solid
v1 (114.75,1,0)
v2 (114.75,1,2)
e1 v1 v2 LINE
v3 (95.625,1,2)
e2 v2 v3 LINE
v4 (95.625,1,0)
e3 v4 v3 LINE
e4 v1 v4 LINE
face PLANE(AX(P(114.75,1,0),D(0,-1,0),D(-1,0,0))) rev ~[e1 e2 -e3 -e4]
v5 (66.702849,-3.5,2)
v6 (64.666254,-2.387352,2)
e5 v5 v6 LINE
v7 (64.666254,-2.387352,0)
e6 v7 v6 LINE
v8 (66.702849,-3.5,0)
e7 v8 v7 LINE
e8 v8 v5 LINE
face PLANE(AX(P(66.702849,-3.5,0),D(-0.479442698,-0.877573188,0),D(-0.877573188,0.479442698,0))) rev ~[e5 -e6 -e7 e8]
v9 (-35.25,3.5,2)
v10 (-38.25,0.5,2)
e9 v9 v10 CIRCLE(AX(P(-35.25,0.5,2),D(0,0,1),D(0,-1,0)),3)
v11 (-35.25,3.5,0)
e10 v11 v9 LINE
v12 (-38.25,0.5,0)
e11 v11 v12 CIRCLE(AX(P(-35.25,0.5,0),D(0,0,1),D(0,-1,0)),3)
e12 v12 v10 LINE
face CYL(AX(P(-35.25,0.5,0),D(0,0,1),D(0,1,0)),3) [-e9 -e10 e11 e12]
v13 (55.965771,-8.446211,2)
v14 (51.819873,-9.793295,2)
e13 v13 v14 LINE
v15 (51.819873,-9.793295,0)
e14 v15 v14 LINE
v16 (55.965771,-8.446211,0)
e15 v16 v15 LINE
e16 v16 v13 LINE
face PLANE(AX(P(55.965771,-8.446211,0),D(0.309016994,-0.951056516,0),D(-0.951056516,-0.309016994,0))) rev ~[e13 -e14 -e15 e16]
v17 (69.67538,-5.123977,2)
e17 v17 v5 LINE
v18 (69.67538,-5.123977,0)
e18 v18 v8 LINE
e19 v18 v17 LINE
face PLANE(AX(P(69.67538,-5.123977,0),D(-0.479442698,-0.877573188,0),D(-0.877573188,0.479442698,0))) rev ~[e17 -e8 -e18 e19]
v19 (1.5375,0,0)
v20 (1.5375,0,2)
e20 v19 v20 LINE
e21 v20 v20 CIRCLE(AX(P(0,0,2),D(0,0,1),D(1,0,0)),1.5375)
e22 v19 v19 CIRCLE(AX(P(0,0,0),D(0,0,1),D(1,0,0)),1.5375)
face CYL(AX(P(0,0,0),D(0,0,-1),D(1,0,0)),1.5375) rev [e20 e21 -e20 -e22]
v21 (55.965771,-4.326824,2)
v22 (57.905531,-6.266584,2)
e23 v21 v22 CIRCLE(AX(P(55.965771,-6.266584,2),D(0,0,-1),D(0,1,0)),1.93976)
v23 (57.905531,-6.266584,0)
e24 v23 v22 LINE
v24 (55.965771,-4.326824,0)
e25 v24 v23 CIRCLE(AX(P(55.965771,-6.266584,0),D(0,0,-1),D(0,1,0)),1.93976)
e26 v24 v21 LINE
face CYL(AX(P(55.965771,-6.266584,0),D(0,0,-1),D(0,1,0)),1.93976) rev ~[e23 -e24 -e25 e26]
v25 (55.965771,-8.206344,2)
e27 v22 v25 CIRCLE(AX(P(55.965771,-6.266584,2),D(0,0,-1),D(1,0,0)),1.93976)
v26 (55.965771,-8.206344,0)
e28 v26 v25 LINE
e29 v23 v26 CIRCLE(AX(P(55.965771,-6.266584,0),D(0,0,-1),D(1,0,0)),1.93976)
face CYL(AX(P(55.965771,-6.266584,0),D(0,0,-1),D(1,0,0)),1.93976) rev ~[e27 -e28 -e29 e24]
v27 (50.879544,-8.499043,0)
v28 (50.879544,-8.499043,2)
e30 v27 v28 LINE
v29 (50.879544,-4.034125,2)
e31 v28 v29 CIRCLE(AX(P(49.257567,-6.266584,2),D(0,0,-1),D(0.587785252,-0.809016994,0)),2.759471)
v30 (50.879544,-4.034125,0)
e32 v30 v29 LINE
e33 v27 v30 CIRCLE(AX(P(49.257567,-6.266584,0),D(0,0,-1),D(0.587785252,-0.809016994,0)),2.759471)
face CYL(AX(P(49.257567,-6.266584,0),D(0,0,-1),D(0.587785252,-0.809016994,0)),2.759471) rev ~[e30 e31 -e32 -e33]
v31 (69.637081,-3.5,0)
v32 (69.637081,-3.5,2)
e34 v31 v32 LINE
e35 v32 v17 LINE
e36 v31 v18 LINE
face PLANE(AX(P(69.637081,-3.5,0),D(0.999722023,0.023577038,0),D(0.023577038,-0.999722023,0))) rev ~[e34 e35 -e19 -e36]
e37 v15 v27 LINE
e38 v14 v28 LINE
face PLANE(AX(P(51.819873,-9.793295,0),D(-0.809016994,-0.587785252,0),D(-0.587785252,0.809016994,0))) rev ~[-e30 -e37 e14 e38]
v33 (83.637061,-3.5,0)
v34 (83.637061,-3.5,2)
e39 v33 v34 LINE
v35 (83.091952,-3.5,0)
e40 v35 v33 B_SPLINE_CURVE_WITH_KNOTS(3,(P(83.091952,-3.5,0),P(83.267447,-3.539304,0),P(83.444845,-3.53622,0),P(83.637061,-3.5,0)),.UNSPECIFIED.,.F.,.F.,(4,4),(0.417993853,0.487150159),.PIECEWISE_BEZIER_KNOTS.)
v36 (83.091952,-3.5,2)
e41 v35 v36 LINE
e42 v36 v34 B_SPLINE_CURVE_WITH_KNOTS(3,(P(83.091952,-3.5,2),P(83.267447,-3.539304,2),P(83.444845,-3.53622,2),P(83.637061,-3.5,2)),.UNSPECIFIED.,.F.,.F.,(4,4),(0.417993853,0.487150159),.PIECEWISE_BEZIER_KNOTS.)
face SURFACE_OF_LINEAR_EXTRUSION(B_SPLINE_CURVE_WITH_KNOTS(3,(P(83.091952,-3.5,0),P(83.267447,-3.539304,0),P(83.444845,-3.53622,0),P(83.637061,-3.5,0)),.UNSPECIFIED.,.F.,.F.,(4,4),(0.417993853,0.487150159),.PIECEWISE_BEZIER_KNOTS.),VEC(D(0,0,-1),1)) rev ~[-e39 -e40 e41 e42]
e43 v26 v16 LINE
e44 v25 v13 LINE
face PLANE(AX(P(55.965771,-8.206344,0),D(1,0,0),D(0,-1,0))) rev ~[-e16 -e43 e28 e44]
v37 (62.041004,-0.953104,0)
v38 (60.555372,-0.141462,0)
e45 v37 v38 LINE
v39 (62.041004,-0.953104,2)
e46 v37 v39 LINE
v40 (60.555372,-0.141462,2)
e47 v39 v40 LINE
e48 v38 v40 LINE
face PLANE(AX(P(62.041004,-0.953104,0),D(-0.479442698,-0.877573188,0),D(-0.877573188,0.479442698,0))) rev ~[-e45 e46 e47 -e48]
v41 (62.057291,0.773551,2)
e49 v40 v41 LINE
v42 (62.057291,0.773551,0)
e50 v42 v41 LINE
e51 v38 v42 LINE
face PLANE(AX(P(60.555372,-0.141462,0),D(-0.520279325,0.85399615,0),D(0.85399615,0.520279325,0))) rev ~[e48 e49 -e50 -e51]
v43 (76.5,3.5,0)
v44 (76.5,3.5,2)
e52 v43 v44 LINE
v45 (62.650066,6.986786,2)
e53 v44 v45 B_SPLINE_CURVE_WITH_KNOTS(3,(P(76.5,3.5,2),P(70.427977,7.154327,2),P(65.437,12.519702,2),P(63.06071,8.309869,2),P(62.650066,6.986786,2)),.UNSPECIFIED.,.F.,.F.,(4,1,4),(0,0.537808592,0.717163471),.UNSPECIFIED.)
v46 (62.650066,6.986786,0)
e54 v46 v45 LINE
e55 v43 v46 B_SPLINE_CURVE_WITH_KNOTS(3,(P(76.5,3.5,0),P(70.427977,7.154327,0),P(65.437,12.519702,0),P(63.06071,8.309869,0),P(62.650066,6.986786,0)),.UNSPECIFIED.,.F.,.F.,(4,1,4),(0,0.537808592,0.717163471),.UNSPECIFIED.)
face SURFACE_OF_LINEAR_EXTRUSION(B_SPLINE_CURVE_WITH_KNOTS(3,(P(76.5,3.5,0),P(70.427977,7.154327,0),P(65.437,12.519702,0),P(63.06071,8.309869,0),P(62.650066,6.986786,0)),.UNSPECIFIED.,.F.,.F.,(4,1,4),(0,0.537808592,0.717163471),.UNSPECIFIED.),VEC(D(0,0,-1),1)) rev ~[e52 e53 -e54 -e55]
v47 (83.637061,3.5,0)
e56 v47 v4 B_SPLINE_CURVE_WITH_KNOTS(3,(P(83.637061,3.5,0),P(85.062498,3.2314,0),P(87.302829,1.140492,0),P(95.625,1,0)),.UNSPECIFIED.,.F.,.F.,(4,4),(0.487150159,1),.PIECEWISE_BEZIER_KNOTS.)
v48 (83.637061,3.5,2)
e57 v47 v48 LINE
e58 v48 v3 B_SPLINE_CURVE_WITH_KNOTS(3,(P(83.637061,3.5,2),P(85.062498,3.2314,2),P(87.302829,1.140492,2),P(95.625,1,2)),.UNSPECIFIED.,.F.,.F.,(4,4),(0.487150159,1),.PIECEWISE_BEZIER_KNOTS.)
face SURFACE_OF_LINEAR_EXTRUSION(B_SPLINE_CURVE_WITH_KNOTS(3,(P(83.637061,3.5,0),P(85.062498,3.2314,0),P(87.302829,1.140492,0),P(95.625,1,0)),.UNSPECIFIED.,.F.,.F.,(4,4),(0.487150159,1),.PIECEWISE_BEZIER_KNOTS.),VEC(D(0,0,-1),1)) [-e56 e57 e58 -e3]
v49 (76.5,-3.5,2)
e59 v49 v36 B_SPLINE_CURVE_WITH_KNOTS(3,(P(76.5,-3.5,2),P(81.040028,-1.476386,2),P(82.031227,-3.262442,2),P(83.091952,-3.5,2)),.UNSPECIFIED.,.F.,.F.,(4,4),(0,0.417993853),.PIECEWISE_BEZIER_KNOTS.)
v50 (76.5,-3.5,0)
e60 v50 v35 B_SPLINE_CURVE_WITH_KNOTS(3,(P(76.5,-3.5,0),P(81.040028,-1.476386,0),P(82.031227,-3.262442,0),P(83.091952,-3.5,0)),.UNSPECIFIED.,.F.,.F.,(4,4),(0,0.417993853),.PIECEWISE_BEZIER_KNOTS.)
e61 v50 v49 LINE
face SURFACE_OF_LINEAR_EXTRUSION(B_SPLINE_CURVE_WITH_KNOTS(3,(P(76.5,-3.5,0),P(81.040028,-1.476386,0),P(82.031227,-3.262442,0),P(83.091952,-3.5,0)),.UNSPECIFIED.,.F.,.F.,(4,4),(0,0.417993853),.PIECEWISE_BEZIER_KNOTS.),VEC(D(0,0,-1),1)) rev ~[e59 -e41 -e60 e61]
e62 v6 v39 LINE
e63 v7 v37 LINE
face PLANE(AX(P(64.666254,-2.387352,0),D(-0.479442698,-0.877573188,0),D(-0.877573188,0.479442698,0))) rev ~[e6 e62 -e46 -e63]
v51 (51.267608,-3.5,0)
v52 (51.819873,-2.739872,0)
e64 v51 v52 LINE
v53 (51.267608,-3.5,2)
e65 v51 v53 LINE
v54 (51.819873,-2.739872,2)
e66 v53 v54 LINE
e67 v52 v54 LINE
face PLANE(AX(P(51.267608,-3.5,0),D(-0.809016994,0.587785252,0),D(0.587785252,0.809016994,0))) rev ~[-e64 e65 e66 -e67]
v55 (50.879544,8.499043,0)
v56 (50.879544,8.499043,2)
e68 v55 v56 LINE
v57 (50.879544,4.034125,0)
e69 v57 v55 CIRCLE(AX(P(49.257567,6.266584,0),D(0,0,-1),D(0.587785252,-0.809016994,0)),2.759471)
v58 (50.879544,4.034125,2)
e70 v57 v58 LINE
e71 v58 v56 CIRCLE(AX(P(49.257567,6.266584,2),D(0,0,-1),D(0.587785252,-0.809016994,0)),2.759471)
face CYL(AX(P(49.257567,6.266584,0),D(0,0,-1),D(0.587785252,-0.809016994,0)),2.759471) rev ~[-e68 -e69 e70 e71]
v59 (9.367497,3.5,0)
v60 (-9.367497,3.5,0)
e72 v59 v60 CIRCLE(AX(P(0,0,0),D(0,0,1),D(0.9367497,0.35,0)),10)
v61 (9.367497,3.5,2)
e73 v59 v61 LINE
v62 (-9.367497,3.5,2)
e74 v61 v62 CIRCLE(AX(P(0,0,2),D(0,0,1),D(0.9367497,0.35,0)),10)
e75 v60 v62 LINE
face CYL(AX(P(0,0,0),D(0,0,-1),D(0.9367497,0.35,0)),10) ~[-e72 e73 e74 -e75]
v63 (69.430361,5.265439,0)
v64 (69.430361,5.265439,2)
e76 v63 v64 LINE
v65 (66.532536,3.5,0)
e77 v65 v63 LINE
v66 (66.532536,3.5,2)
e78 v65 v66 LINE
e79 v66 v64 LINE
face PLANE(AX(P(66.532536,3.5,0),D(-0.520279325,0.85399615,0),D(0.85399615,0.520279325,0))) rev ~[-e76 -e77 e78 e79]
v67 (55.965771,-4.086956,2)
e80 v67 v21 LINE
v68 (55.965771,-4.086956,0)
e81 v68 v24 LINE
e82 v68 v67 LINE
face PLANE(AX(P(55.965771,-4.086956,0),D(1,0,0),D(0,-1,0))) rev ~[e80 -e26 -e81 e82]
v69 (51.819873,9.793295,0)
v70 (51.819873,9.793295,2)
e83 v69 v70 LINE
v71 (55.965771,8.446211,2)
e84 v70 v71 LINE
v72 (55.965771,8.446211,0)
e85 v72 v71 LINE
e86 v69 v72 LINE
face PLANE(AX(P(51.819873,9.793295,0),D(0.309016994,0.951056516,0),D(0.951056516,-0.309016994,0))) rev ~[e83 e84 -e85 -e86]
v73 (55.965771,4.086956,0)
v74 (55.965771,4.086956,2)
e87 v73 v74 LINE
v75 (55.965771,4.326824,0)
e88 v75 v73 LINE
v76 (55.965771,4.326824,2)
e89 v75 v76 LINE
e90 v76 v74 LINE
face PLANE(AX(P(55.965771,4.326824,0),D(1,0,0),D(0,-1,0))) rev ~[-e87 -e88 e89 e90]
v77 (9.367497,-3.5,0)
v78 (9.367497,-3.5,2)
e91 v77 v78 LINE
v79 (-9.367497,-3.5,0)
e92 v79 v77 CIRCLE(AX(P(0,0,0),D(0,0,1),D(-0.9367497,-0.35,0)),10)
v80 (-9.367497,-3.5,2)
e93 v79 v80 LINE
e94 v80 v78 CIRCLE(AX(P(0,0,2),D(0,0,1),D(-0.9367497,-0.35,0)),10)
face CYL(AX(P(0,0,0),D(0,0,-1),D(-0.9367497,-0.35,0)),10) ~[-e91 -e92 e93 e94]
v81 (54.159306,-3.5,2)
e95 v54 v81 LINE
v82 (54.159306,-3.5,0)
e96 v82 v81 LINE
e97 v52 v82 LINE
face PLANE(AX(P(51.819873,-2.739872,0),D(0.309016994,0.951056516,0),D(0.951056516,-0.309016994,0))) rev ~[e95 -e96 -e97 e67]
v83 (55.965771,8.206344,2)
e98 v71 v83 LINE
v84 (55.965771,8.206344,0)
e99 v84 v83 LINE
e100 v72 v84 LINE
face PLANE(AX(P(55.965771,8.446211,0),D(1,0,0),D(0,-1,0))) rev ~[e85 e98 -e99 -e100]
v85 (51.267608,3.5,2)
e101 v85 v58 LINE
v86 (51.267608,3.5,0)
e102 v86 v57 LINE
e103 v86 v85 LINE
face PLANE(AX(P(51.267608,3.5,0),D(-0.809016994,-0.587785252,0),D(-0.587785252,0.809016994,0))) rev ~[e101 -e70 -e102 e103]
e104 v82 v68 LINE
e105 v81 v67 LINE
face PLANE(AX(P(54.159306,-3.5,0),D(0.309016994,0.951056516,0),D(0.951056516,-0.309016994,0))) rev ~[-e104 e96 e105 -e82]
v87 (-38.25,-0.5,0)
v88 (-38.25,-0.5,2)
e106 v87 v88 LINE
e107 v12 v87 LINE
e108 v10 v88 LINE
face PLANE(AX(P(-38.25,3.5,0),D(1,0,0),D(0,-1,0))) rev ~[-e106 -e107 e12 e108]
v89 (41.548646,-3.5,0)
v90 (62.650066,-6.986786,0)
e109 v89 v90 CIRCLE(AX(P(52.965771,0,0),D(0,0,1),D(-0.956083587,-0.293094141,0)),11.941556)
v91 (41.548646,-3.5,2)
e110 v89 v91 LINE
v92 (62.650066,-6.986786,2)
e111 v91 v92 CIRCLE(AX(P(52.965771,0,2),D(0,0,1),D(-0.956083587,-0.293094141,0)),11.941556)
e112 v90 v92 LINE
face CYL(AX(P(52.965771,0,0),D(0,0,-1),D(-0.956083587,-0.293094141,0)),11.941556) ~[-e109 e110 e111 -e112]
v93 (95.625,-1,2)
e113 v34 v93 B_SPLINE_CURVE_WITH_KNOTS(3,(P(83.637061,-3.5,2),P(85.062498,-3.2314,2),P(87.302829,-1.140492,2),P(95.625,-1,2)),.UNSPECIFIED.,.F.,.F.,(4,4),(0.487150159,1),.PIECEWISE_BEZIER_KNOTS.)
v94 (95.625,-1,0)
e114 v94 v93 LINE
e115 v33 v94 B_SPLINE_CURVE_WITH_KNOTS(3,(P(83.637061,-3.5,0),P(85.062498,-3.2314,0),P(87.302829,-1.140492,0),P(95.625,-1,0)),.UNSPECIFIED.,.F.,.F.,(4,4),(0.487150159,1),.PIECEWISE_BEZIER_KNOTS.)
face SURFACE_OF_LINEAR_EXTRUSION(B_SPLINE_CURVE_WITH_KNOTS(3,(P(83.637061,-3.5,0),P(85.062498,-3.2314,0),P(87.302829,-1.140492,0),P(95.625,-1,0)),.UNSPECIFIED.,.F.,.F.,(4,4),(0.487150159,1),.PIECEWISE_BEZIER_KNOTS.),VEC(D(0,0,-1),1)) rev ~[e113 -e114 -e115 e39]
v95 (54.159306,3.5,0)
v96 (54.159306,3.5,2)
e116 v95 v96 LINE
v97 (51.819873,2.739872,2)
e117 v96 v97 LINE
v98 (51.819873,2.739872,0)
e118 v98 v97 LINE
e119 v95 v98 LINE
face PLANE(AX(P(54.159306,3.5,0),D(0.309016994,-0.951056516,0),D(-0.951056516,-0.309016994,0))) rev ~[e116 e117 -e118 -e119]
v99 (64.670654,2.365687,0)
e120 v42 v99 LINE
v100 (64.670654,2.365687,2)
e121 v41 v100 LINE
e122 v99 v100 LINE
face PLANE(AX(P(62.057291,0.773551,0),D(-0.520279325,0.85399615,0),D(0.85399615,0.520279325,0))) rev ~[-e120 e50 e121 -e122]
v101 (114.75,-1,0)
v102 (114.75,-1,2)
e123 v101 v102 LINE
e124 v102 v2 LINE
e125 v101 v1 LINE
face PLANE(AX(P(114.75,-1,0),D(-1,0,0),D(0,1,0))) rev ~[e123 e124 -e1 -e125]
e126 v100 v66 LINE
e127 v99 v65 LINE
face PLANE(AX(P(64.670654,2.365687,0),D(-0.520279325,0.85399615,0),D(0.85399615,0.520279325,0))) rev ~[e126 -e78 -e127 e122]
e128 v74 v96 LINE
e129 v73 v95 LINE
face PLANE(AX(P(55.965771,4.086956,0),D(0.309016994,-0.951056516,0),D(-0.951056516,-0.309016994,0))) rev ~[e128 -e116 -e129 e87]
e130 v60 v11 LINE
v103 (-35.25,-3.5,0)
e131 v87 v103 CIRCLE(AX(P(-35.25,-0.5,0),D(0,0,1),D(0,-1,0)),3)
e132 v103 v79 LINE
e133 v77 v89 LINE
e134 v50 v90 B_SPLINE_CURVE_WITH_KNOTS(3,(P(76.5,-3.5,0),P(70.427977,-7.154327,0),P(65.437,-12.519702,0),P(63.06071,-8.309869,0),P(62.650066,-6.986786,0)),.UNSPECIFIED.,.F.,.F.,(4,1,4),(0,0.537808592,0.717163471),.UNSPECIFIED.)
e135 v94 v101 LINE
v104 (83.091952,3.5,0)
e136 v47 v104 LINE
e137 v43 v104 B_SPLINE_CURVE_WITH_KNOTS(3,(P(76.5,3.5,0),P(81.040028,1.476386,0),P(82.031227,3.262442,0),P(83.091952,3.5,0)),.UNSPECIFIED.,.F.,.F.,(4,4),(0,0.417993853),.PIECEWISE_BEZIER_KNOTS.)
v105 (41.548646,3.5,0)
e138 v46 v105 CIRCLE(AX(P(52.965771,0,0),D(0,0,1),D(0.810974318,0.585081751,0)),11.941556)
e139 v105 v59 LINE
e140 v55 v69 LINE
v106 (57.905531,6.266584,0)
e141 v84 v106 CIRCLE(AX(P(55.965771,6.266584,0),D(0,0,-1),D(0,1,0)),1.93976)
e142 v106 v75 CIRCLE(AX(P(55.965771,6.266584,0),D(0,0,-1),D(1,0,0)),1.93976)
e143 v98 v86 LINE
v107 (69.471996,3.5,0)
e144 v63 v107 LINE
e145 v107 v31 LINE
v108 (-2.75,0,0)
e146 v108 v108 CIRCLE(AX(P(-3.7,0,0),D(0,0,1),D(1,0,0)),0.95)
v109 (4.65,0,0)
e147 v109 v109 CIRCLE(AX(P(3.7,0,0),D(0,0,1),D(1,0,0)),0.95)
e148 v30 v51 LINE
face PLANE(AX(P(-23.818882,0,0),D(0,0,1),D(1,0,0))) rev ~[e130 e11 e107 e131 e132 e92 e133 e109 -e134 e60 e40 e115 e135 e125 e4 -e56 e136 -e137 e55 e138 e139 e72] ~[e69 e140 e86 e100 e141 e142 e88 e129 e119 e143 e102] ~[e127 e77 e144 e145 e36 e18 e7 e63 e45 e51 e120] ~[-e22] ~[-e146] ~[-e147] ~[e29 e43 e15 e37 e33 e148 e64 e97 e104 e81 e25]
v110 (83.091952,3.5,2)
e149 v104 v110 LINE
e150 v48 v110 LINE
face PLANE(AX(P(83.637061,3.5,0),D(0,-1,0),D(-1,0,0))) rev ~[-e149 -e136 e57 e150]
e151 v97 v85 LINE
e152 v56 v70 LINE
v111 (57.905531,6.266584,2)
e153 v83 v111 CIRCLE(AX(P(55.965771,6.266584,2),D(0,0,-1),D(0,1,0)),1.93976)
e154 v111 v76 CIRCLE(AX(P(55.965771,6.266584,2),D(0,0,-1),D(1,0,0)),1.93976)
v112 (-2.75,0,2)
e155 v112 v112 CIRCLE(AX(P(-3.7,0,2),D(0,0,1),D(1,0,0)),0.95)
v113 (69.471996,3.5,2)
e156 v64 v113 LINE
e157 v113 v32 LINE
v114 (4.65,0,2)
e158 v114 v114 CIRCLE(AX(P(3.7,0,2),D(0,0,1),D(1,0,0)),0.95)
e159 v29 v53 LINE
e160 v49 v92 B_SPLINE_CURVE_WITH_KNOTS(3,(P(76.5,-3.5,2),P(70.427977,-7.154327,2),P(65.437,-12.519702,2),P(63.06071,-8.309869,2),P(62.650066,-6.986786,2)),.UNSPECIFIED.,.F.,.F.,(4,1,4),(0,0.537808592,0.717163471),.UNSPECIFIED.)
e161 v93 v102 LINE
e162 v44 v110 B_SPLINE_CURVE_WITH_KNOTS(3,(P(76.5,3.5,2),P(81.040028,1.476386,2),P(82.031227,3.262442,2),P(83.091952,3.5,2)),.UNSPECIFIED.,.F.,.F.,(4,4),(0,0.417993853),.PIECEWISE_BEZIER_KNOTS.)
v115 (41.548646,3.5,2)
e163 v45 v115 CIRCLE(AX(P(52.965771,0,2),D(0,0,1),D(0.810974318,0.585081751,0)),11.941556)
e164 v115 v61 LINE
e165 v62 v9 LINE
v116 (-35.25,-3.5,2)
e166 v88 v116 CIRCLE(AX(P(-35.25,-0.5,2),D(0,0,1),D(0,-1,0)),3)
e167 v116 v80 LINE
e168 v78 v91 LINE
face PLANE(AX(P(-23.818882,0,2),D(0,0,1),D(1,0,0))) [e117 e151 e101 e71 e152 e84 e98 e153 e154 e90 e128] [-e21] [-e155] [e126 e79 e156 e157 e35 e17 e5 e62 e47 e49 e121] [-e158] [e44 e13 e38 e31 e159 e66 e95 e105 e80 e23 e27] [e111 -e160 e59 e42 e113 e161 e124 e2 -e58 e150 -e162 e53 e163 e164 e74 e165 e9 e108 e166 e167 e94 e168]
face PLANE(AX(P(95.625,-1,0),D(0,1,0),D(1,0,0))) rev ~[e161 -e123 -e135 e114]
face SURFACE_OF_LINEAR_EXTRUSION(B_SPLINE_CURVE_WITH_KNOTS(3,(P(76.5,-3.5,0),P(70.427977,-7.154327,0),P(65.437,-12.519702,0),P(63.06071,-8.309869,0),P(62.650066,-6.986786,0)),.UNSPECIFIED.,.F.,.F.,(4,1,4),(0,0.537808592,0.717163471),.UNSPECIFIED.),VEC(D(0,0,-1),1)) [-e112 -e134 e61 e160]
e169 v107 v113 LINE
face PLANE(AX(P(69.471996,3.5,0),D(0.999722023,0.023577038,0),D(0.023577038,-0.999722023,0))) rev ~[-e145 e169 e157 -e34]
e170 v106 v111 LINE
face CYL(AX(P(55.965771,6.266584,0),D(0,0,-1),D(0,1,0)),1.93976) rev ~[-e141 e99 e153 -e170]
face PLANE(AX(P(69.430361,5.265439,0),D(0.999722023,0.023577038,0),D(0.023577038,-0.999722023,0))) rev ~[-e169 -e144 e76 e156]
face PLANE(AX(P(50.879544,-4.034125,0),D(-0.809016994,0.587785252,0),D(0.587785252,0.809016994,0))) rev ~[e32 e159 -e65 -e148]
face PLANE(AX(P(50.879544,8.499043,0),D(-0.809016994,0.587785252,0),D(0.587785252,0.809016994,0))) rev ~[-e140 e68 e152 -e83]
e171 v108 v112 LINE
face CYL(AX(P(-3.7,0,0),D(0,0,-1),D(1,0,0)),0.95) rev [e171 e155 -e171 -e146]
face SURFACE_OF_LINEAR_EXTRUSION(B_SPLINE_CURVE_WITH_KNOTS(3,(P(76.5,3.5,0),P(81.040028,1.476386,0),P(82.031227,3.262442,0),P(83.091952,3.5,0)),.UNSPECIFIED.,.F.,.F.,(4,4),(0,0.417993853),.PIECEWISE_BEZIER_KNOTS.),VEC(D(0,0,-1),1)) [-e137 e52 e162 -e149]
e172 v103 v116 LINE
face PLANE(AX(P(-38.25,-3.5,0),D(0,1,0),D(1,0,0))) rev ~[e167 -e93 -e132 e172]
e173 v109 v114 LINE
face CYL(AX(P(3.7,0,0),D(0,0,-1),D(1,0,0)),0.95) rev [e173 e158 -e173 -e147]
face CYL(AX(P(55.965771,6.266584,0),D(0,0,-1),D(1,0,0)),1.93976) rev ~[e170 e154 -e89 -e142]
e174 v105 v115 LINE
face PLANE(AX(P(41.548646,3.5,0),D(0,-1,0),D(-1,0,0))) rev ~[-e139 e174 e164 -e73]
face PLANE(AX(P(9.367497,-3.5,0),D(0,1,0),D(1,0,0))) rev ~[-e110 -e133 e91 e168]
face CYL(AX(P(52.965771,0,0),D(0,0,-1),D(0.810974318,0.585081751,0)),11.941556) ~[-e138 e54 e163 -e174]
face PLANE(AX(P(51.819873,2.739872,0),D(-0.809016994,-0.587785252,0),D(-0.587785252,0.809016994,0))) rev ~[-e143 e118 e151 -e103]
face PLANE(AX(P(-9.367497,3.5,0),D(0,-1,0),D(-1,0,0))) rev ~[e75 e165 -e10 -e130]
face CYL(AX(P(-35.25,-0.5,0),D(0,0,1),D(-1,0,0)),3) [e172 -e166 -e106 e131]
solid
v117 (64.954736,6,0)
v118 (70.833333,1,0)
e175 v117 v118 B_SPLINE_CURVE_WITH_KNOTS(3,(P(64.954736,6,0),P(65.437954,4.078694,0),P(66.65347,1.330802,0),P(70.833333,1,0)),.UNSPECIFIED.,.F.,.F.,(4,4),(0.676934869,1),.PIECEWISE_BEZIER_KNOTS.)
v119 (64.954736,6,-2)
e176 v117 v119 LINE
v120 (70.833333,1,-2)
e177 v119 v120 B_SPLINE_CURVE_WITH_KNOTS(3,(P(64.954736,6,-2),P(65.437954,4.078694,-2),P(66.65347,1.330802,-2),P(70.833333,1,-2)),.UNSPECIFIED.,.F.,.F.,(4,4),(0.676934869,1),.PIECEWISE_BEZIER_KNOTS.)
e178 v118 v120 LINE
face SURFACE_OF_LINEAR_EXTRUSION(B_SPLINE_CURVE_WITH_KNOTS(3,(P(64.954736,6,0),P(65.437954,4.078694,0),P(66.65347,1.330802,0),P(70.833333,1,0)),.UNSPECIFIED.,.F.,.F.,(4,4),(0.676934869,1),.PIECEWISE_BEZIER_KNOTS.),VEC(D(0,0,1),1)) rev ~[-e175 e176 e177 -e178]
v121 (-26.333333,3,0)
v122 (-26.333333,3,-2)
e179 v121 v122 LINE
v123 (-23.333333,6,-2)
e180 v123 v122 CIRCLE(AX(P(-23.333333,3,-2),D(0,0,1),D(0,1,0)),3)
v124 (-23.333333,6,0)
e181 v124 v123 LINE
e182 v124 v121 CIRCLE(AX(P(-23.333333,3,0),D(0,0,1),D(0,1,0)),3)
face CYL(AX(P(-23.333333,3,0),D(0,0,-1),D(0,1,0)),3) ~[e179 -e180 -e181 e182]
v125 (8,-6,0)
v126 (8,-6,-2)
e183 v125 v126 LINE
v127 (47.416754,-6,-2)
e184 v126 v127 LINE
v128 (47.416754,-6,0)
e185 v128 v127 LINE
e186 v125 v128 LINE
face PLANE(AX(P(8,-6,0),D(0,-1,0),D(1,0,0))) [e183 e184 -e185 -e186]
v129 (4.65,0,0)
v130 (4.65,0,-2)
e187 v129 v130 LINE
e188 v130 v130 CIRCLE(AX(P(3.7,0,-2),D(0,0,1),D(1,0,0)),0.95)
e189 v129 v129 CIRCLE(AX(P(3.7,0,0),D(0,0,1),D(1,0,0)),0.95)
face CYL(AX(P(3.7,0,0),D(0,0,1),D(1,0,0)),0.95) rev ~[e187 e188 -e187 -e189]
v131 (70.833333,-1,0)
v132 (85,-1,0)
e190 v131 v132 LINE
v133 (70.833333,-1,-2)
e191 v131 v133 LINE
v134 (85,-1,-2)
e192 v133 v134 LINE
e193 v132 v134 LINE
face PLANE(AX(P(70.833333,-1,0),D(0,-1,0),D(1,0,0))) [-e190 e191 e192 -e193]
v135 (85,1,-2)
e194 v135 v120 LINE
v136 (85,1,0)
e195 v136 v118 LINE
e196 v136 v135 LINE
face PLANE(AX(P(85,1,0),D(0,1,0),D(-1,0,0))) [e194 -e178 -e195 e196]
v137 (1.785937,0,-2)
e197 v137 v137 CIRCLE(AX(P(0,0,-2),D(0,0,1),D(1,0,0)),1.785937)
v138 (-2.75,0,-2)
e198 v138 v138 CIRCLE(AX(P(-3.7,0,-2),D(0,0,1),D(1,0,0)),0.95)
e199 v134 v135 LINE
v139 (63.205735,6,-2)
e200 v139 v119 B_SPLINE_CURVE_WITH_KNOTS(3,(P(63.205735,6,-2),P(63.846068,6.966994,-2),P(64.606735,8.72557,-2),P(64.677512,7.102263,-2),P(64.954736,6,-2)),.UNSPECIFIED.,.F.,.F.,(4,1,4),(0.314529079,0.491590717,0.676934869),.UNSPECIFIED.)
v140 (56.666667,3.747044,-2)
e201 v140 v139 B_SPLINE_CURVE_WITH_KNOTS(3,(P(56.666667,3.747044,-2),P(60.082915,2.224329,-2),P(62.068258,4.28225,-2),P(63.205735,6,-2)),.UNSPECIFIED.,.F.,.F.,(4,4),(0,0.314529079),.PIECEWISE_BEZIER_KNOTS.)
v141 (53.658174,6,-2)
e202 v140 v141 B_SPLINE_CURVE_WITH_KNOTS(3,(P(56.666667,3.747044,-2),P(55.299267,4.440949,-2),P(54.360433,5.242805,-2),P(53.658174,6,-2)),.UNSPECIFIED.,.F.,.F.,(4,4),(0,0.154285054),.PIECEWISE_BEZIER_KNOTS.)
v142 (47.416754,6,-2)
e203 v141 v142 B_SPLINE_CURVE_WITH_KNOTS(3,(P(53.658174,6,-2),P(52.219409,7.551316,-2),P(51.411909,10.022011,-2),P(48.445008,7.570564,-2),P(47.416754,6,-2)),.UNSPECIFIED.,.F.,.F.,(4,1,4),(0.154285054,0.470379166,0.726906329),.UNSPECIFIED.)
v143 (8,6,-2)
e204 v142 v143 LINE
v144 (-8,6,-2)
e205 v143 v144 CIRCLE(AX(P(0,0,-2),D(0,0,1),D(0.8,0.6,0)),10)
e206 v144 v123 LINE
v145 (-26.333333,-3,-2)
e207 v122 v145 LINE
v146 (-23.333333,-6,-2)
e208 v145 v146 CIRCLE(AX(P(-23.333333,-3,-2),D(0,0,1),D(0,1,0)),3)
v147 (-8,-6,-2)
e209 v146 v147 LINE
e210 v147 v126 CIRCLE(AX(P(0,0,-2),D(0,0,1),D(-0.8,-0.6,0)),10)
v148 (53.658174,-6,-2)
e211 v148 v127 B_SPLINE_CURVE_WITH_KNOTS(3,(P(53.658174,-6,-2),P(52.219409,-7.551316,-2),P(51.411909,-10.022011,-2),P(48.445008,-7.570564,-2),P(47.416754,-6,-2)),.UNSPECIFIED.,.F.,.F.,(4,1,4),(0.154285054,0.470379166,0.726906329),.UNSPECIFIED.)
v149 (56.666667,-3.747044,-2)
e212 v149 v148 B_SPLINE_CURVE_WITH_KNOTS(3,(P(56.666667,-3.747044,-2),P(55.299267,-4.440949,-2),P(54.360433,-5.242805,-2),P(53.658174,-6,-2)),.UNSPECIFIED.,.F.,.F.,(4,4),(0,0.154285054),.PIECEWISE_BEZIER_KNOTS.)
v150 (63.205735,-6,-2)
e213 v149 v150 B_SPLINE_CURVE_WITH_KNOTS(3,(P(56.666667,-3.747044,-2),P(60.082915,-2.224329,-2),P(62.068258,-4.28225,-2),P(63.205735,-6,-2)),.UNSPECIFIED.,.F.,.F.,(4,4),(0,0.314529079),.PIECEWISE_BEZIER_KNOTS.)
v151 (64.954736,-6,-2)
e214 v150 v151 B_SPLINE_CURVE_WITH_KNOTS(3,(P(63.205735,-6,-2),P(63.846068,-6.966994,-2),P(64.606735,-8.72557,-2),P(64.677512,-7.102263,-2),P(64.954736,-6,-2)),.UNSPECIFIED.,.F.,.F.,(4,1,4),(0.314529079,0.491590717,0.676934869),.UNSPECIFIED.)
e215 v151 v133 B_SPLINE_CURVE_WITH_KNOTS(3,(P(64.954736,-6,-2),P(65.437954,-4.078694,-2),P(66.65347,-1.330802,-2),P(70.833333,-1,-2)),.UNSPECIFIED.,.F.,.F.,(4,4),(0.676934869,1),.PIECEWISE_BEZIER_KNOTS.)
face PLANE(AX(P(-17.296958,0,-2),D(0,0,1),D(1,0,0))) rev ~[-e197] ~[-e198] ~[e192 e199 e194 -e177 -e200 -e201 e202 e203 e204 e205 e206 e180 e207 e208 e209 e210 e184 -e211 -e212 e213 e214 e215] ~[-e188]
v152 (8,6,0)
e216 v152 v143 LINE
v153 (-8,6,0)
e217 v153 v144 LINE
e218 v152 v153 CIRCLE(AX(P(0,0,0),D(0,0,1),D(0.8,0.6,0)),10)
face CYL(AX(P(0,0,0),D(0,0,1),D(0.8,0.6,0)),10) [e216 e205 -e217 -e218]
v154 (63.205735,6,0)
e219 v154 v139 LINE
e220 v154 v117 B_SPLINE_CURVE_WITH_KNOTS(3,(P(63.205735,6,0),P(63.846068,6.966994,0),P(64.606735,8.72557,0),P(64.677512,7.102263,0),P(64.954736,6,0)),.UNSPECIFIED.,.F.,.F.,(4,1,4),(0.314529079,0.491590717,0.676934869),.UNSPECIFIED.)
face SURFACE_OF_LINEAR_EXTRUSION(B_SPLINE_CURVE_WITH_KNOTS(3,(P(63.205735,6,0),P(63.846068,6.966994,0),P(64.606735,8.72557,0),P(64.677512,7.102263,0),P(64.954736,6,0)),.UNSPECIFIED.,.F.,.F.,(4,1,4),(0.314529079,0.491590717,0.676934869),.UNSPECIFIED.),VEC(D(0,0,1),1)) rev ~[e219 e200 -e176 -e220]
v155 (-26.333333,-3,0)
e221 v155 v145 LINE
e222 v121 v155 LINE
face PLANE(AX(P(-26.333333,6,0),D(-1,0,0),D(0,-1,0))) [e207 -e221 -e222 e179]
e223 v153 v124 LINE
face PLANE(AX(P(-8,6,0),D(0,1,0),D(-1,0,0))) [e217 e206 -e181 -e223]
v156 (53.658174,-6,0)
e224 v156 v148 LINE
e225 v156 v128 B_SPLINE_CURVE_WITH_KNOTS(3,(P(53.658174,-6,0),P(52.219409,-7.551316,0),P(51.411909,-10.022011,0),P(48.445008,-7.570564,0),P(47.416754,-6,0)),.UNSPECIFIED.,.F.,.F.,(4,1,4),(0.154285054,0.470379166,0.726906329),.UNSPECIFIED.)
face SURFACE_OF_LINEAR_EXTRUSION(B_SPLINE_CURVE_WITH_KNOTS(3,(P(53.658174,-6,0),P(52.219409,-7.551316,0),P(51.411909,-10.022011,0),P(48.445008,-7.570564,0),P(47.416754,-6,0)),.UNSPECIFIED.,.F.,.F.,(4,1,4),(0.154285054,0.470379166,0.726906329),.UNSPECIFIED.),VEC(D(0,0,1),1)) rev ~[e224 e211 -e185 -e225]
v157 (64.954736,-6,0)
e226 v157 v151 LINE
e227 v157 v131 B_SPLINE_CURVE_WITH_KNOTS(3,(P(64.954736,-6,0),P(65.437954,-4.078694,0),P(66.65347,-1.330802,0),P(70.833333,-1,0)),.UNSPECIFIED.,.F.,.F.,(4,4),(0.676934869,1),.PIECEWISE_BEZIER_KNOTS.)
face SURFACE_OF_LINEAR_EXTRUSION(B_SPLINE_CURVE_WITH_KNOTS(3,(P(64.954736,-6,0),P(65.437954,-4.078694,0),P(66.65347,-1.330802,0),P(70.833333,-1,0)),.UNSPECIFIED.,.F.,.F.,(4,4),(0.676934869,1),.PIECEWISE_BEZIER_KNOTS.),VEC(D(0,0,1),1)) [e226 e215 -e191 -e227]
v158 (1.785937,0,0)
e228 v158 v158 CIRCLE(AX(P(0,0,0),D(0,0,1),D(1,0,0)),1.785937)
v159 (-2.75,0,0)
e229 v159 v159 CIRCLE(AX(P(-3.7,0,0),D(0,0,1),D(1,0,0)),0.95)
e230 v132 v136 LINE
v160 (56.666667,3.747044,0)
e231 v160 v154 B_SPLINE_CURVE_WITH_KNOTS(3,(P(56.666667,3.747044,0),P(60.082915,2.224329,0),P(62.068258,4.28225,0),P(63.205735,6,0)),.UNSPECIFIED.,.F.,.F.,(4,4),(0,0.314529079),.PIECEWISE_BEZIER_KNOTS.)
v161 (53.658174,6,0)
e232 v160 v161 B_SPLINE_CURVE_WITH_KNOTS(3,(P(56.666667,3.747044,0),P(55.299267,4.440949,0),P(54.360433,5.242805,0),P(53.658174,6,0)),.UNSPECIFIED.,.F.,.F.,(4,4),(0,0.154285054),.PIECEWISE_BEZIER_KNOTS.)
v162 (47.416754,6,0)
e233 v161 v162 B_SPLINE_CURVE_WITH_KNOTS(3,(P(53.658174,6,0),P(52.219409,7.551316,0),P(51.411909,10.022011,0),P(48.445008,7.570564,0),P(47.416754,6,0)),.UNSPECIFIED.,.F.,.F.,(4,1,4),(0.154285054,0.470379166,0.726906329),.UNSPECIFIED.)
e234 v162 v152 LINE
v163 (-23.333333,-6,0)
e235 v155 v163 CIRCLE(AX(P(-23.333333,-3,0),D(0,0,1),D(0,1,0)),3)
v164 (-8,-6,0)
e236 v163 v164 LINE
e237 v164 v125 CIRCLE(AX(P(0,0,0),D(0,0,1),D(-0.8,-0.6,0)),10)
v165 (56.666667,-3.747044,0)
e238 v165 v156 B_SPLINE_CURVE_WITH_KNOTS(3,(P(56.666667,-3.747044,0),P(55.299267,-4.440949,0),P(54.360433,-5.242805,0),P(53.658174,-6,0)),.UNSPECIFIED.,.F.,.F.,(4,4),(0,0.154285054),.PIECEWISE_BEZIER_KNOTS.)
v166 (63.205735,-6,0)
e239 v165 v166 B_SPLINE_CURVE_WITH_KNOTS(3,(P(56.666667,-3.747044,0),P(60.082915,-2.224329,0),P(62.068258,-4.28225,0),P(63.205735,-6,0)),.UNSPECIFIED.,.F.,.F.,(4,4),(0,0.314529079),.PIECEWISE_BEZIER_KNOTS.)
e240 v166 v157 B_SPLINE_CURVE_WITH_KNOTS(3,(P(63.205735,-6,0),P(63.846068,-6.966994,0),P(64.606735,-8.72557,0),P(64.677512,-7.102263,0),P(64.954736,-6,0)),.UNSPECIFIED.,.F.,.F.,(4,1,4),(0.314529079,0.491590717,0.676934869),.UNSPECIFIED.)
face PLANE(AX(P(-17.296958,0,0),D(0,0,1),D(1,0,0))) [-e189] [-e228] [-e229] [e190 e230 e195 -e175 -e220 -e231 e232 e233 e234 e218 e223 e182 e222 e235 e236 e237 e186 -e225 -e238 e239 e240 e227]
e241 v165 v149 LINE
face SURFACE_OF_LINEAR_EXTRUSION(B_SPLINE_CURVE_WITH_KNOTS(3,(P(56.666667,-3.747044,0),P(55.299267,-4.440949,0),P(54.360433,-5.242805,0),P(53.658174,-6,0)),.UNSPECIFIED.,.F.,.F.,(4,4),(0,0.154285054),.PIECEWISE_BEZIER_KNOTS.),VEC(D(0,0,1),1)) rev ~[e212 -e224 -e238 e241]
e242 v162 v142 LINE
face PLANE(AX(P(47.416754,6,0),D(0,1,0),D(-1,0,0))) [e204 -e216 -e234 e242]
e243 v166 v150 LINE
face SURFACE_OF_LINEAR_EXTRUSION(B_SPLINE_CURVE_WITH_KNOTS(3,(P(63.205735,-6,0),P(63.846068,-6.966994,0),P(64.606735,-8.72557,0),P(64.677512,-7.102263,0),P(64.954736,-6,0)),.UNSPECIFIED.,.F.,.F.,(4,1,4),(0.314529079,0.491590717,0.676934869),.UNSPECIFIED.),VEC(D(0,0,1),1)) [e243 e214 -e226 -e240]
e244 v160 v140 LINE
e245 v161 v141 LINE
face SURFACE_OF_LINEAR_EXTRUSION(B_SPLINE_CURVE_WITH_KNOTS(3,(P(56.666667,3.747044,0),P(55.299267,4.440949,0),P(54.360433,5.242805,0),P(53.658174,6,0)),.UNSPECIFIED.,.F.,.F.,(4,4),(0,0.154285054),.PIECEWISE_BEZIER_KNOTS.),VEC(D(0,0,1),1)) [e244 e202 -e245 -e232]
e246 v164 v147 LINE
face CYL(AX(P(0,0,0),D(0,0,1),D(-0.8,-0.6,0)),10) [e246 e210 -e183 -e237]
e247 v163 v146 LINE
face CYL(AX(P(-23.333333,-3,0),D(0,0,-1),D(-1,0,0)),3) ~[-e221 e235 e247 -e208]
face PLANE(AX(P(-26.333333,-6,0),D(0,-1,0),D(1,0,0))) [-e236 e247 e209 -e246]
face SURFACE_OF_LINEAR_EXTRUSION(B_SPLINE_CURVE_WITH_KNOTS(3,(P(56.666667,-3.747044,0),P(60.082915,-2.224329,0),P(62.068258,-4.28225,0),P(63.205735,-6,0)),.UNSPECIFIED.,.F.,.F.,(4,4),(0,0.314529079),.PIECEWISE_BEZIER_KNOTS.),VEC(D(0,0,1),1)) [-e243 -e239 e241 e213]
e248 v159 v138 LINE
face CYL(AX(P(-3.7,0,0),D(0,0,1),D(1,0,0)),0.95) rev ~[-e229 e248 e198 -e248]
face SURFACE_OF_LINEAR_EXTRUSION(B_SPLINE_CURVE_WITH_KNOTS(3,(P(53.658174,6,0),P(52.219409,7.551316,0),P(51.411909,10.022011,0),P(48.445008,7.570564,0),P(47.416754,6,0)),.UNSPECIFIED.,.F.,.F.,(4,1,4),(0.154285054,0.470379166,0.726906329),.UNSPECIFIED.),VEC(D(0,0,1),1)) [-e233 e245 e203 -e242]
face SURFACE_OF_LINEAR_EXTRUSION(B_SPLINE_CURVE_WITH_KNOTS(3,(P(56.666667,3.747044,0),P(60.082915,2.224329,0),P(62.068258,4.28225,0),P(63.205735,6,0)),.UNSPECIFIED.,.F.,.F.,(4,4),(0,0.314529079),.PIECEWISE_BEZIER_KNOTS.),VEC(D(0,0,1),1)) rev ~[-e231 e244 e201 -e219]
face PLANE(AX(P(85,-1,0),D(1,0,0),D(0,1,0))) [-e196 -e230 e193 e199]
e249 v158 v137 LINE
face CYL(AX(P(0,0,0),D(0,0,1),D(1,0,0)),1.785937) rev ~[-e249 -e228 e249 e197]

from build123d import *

# Parameters (mm, degrees)
F0_R     = 0.95
F0_R_2   = 1.5375
F1_DEPTH = 2
F2_R     = 0.95
F2_R_2   = 1.7859375
F3_DEPTH = 2
F4_R     = 3
F4_2_R   = 3


with BuildPart() as f1:
    # F0 (on Top) → F1 (new body)
    with BuildSketch(Plane.XY):
        with BuildLine():
            Line((-9.3674969976, 3.5), (-38.25, 3.5))
            Line((-38.25, 3.5), (-38.25, -3.5))
            Line((-38.25, -3.5), (-9.3674969976, -3.5))
            ThreePointArc((-9.3674969976, -3.5), (-10, 0), (-9.3674969976, 3.5))
        make_face()
        with BuildLine():
            ThreePointArc((9.3674969976, 3.5), (0, 10), (-9.3674969976, 3.5))
            Line((-9.3674969976, 3.5), (9.3674969976, 3.5))
        make_face()
        with BuildLine():
            Line((9.3674969976, 3.5), (-9.3674969976, 3.5))
            ThreePointArc((-9.3674969976, 3.5), (-10, 0), (-9.3674969976, -3.5))
            Line((-9.3674969976, -3.5), (9.3674969976, -3.5))
            ThreePointArc((9.3674969976, -3.5), (9.8406038935, -1.7783461452), (10, 0))
            ThreePointArc((10, 0), (9.8406038935, 1.7783461452), (9.3674969976, 3.5))
        make_face()
        with Locations((-3.7, 0)):
            Circle(F0_R, mode=Mode.SUBTRACT)
        Circle(F0_R_2, mode=Mode.SUBTRACT)
        with Locations((3.7, 0)):
            Circle(F0_R, mode=Mode.SUBTRACT)
        with BuildLine():
            Line((41.5486460336, 3.5), (9.3674969976, 3.5))
            ThreePointArc((9.3674969976, 3.5), (9.8406038935, 1.7783461452), (10, 0))
            ThreePointArc((10, 0), (9.8406038935, -1.7783461452), (9.3674969976, -3.5))
            Line((9.3674969976, -3.5), (41.5486460336, -3.5))
            ThreePointArc((41.5486460336, -3.5), (41.0242157381, 0), (41.5486460336, 3.5))
        make_face()
        with BuildLine():
            Line((9.3674969976, -3.5), (-9.3674969976, -3.5))
            ThreePointArc((-9.3674969976, -3.5), (0, -10), (9.3674969976, -3.5))
        make_face()
        with BuildLine():
            ThreePointArc((62.6500663761, 6.9867862956), (51.0189547822, 11.7817934467), (41.5486460336, 3.5))
            Line((41.5486460336, 3.5), (51.2676081814, 3.5))
            Line((51.2676081814, 3.5), (50.8795437488, 4.034124869))
            ThreePointArc((50.8795437488, 4.034124869), (46.4980966164, 6.2665836886), (50.8795437488, 8.4990425082))
            Line((50.8795437488, 8.4990425082), (51.8198733731, 9.7932952023))
            Line((51.8198733731, 9.7932952023), (55.9657714069, 8.4462112726))
            Line((55.9657714069, 8.4462112726), (55.9657714069, 8.2063436542))
            ThreePointArc((55.9657714069, 8.2063436542), (57.3373888325, 7.6382011141), (57.9055313725, 6.2665836886))
            ThreePointArc((57.9055313725, 6.2665836886), (57.3373888325, 4.894966263), (55.9657714069, 4.3268237229))
            Line((55.9657714069, 4.3268237229), (55.9657714069, 4.0869561045))
            Line((55.9657714069, 4.0869561045), (54.1593062669, 3.5))
            Line((54.1593062669, 3.5), (62.0300889952, 3.5))
            add(Edge.make_bspline(
                [(62.6500663761, 6.9867862956), (62.325026984, 5.9395183136), (62.1150441282, 4.7229315023), (62.0300889952, 3.5)],
                knots=[0.7171634713, 0.7171634713, 0.7171634713, 0.7171634713, 0.8591293722, 0.8591293722, 0.8591293722, 0.8591293722], degree=3))
        make_face()
        with BuildLine():
            Line((51.2676081814, 3.5), (41.5486460336, 3.5))
            ThreePointArc((41.5486460336, 3.5), (41.0242157381, 0), (41.5486460336, -3.5))
            Line((41.5486460336, -3.5), (51.2676081814, -3.5))
            Line((51.2676081814, -3.5), (51.8198733731, -2.7398721748))
            Line((51.8198733731, -2.7398721748), (54.1593062669, -3.5))
            Line((54.1593062669, -3.5), (62.0300889952, -3.5))
            add(Edge.make_bspline(
                [(62.0300889952, -3.5), (61.9699977026, -2.634984173), (61.9724597012, -1.7667939996), (62.0410036734, -0.953104062)],
                knots=[0.8591293722, 0.8591293722, 0.8591293722, 0.8591293722, 0.9595460766, 0.9595460766, 0.9595460766, 0.9595460766], degree=3))
            Line((62.0410036734, -0.953104062), (60.5553723025, -0.141462227))
            Line((60.5553723025, -0.141462227), (62.057291222, 0.7735505189))
            add(Edge.make_bspline(
                [(62.0300889952, 3.5), (61.9655550988, 2.5710327675), (61.9731656392, 1.6384044737), (62.057291222, 0.7735505189)],
                knots=[0.8591293722, 0.8591293722, 0.8591293722, 0.8591293722, 0.9669699747, 0.9669699747, 0.9669699747, 0.9669699747], degree=3))
            Line((62.0300889952, 3.5), (54.1593062669, 3.5))
            Line((54.1593062669, 3.5), (51.8198733731, 2.7398721748))
            Line((51.8198733731, 2.7398721748), (51.2676081814, 3.5))
        make_face()
        with BuildLine():
            ThreePointArc((64.3828967802, 3.5), (63.6595501958, 5.3144940497), (62.6500663761, 6.9867862956))
            add(Edge.make_bspline(
                [(62.6500663761, 6.9867862956), (62.325026984, 5.9395183136), (62.1150441282, 4.7229315023), (62.0300889952, 3.5)],
                knots=[0.7171634713, 0.7171634713, 0.7171634713, 0.7171634713, 0.8591293722, 0.8591293722, 0.8591293722, 0.8591293722], degree=3))
            Line((62.0300889952, 3.5), (64.3828967802, 3.5))
        make_face()
        with BuildLine():
            add(Edge.make_bspline(
                [(76.5, 3.5), (70.4279765487, 7.1543273516), (65.4370003335, 12.5197019264), (63.0607100626, 8.3098689603), (62.6500663761, 6.9867862956)],
                knots=[0, 0, 0, 0, 0.5378085921, 0.7171634713, 0.7171634713, 0.7171634713, 0.7171634713], degree=3))
            ThreePointArc((62.6500663761, 6.9867862956), (63.6595501958, 5.3144940497), (64.3828967802, 3.5))
            Line((64.3828967802, 3.5), (66.5325360501, 3.5))
            Line((66.5325360501, 3.5), (69.4303606274, 5.2654391254))
            Line((69.4303606274, 5.2654391254), (69.4719960261, 3.5))
            Line((69.4719960261, 3.5), (76.5, 3.5))
        make_face()
        with BuildLine():
            Line((51.2676081814, -3.5), (41.5486460336, -3.5))
            ThreePointArc((41.5486460336, -3.5), (51.0189547822, -11.7817934467), (62.6500663761, -6.9867862956))
            add(Edge.make_bspline(
                [(62.6500663761, -6.9867862956), (62.325026984, -5.9395183136), (62.1150441282, -4.7229315023), (62.0300889952, -3.5)],
                knots=[0.7171634713, 0.7171634713, 0.7171634713, 0.7171634713, 0.8591293722, 0.8591293722, 0.8591293722, 0.8591293722], degree=3))
            Line((62.0300889952, -3.5), (54.1593062669, -3.5))
            Line((54.1593062669, -3.5), (55.9657714069, -4.0869561045))
            Line((55.9657714069, -4.0869561045), (55.9657714069, -4.3268237229))
            ThreePointArc((55.9657714069, -4.3268237229), (57.3373888325, -4.894966263), (57.9055313725, -6.2665836886))
            ThreePointArc((57.9055313725, -6.2665836886), (57.3373888325, -7.6382011141), (55.9657714069, -8.2063436542))
            Line((55.9657714069, -8.2063436542), (55.9657714069, -8.4462112726))
            Line((55.9657714069, -8.4462112726), (51.8198733731, -9.7932952023))
            Line((51.8198733731, -9.7932952023), (50.8795437488, -8.4990425082))
            ThreePointArc((50.8795437488, -8.4990425082), (46.4980966164, -6.2665836886), (50.8795437488, -4.034124869))
            Line((50.8795437488, -4.034124869), (51.2676081814, -3.5))
        make_face()
        with BuildLine():
            add(Edge.make_bspline(
                [(76.5, 3.5), (81.0400280542, 1.4763858349), (82.0312268078, 3.2624417994), (83.0919519067, 3.5)],
                knots=[0, 0, 0, 0, 0.4179938527, 0.4179938527, 0.4179938527, 0.4179938527], degree=3))
            Line((76.5, 3.5), (69.4719960261, 3.5))
            Line((69.4719960261, 3.5), (69.6370811808, -3.5))
            Line((69.6370811808, -3.5), (76.5, -3.5))
            add(Edge.make_bspline(
                [(76.5, -3.5), (81.0400280542, -1.4763858349), (82.0312268078, -3.2624417994), (83.0919519067, -3.5)],
                knots=[0, 0, 0, 0, 0.4179938527, 0.4179938527, 0.4179938527, 0.4179938527], degree=3))
            Line((83.0919519067, -3.5), (83.6370610277, -3.5))
            add(Edge.make_bspline(
                [(83.6370610277, -3.5), (85.0624976542, -3.2313997522), (87.3028287907, -1.1404920716), (95.625, -1)],
                knots=[0.4871501593, 0.4871501593, 0.4871501593, 0.4871501593, 1, 1, 1, 1], degree=3))
            Line((95.625, -1), (114.75, -1))
            Line((114.75, -1), (114.75, 1))
            Line((114.75, 1), (95.625, 1))
            add(Edge.make_bspline(
                [(83.6370610277, 3.5), (85.0624976542, 3.2313997522), (87.3028287907, 1.1404920716), (95.625, 1)],
                knots=[0.4871501593, 0.4871501593, 0.4871501593, 0.4871501593, 1, 1, 1, 1], degree=3))
            Line((83.6370610277, 3.5), (83.0919519067, 3.5))
        make_face()
        with BuildLine():
            Line((64.3828967802, 3.5), (62.0300889952, 3.5))
            add(Edge.make_bspline(
                [(62.0300889952, 3.5), (61.9655550988, 2.5710327675), (61.9731656392, 1.6384044737), (62.057291222, 0.7735505189)],
                knots=[0.8591293722, 0.8591293722, 0.8591293722, 0.8591293722, 0.9669699747, 0.9669699747, 0.9669699747, 0.9669699747], degree=3))
            Line((62.057291222, 0.7735505189), (64.6706539693, 2.3656872131))
            ThreePointArc((64.6706539693, 2.3656872131), (64.5406787119, 2.936370663), (64.3828967802, 3.5))
        make_face()
        with BuildLine():
            Line((66.5325360501, 3.5), (64.3828967802, 3.5))
            ThreePointArc((64.3828967802, 3.5), (64.5406787119, 2.936370663), (64.6706539693, 2.3656872131))
            Line((64.6706539693, 2.3656872131), (66.5325360501, 3.5))
        make_face()
        with BuildLine():
            ThreePointArc((64.3828967802, -3.5), (63.6595501958, -5.3144940497), (62.6500663761, -6.9867862956))
            add(Edge.make_bspline(
                [(76.5, -3.5), (70.4279765487, -7.1543273516), (65.4370003335, -12.5197019264), (63.0607100626, -8.3098689603), (62.6500663761, -6.9867862956)],
                knots=[0, 0, 0, 0, 0.5378085921, 0.7171634713, 0.7171634713, 0.7171634713, 0.7171634713], degree=3))
            Line((76.5, -3.5), (69.6370811808, -3.5))
            Line((69.6370811808, -3.5), (69.6753803918, -5.1239768984))
            Line((69.6753803918, -5.1239768984), (66.7028487634, -3.5))
            Line((66.7028487634, -3.5), (64.3828967802, -3.5))
        make_face()
        with BuildLine():
            add(Edge.make_bspline(
                [(62.6500663761, -6.9867862956), (62.325026984, -5.9395183136), (62.1150441282, -4.7229315023), (62.0300889952, -3.5)],
                knots=[0.7171634713, 0.7171634713, 0.7171634713, 0.7171634713, 0.8591293722, 0.8591293722, 0.8591293722, 0.8591293722], degree=3))
            ThreePointArc((62.6500663761, -6.9867862956), (63.6595501958, -5.3144940497), (64.3828967802, -3.5))
            Line((64.3828967802, -3.5), (62.0300889952, -3.5))
        make_face()
        with BuildLine():
            add(Edge.make_bspline(
                [(62.0300889952, -3.5), (61.9699977026, -2.634984173), (61.9724597012, -1.7667939996), (62.0410036734, -0.953104062)],
                knots=[0.8591293722, 0.8591293722, 0.8591293722, 0.8591293722, 0.9595460766, 0.9595460766, 0.9595460766, 0.9595460766], degree=3))
            Line((62.0300889952, -3.5), (64.3828967802, -3.5))
            ThreePointArc((64.3828967802, -3.5), (64.5379557834, -2.9470833965), (64.6662544489, -2.3873517488))
            Line((64.6662544489, -2.3873517488), (62.0410036734, -0.953104062))
        make_face()
        with BuildLine():
            ThreePointArc((64.6662544489, -2.3873517488), (64.5379557834, -2.9470833965), (64.3828967802, -3.5))
            Line((64.3828967802, -3.5), (66.7028487634, -3.5))
            Line((66.7028487634, -3.5), (64.6662544489, -2.3873517488))
        make_face()
        with BuildLine():
            Line((83.6370610277, -3.5), (83.0919519067, -3.5))
            add(Edge.make_bspline(
                [(83.0919519067, -3.5), (83.2674469041, -3.5393035631), (83.4448450524, -3.5362199607), (83.6370610277, -3.5)],
                knots=[0.4179938527, 0.4179938527, 0.4179938527, 0.4179938527, 0.4871501593, 0.4871501593, 0.4871501593, 0.4871501593], degree=3))
        make_face()
    extrude(amount=F1_DEPTH)

    # F4
    f4_edges = [f1.edges().sort_by_distance(p)[0] for p in [
        (-38.25, 3.5, 1),
        (-38.25, -3.5, 1),
    ]]
    fillet(f4_edges, radius=F4_R)


with BuildPart() as f3:
    # F2 (on Top) → F3 (new body)
    with BuildSketch(Plane.XY):
        with BuildLine():
            Line((-8, 6), (-26.33333333, 6))
            Line((-26.33333333, 6), (-26.33333333, -6))
            Line((-26.33333333, -6), (-8, -6))
            ThreePointArc((-8, -6), (-10, 0), (-8, 6))
        make_face()
        with BuildLine():
            ThreePointArc((8, 6), (0, 10), (-8, 6))
            Line((-8, 6), (8, 6))
        make_face()
        with BuildLine():
            Line((8, -6), (-8, -6))
            ThreePointArc((-8, -6), (0, -10), (8, -6))
        make_face()
        with BuildLine():
            Line((53.6581738244, 6), (47.4167542526, 6))
            add(Edge.make_bspline(
                [(47.4167542526, 6), (46.3220957553, 4.3280086445), (45.5684344657, 2.1206918096), (46.0416666667, 0)],
                knots=[0.726906329, 0.726906329, 0.726906329, 0.726906329, 1, 1, 1, 1], degree=3))
            add(Edge.make_bspline(
                [(47.4167542526, -6), (46.3220957553, -4.3280086445), (45.5684344657, -2.1206918096), (46.0416666667, 0)],
                knots=[0.726906329, 0.726906329, 0.726906329, 0.726906329, 1, 1, 1, 1], degree=3))
            Line((47.4167542526, -6), (53.6581738244, -6))
            add(Edge.make_bspline(
                [(56.6666666667, -3.747044364), (55.2992674084, -4.4409490289), (54.3604326541, -5.2428049781), (53.6581738244, -6)],
                knots=[0, 0, 0, 0, 0.1542850544, 0.1542850544, 0.1542850544, 0.1542850544], degree=3))
            add(Edge.make_bspline(
                [(56.6666666667, -3.747044364), (60.0829150948, -2.2243293877), (62.0682583427, -4.2822499198), (63.2057347542, -6)],
                knots=[0, 0, 0, 0, 0.314529079, 0.314529079, 0.314529079, 0.314529079], degree=3))
            Line((63.2057347542, -6), (64.9547362718, -6))
            add(Edge.make_bspline(
                [(64.9547362718, -6), (65.4379538782, -4.0786939052), (66.6534703528, -1.3308020565), (70.8333333333, -1)],
                knots=[0.6769348689, 0.6769348689, 0.6769348689, 0.6769348689, 1, 1, 1, 1], degree=3))
            Line((70.8333333333, -1), (85, -1))
            Line((85, -1), (85, 1))
            Line((85, 1), (70.8333333333, 1))
            add(Edge.make_bspline(
                [(64.9547362718, 6), (65.4379538782, 4.0786939052), (66.6534703528, 1.3308020565), (70.8333333333, 1)],
                knots=[0.6769348689, 0.6769348689, 0.6769348689, 0.6769348689, 1, 1, 1, 1], degree=3))
            Line((64.9547362718, 6), (63.2057347542, 6))
            add(Edge.make_bspline(
                [(56.6666666667, 3.747044364), (60.0829150948, 2.2243293877), (62.0682583427, 4.2822499198), (63.2057347542, 6)],
                knots=[0, 0, 0, 0, 0.314529079, 0.314529079, 0.314529079, 0.314529079], degree=3))
            add(Edge.make_bspline(
                [(56.6666666667, 3.747044364), (55.2992674084, 4.4409490289), (54.3604326541, 5.2428049781), (53.6581738244, 6)],
                knots=[0, 0, 0, 0, 0.1542850544, 0.1542850544, 0.1542850544, 0.1542850544], degree=3))
        make_face()
        with BuildLine():
            Line((47.4167542526, 6), (8, 6))
            ThreePointArc((8, 6), (9.4868329805, 3.1622776602), (10, 0))
            ThreePointArc((10, 0), (9.4868329805, -3.1622776602), (8, -6))
            Line((8, -6), (47.4167542526, -6))
            add(Edge.make_bspline(
                [(47.4167542526, -6), (46.3220957553, -4.3280086445), (45.5684344657, -2.1206918096), (46.0416666667, 0)],
                knots=[0.726906329, 0.726906329, 0.726906329, 0.726906329, 1, 1, 1, 1], degree=3))
            add(Edge.make_bspline(
                [(47.4167542526, 6), (46.3220957553, 4.3280086445), (45.5684344657, 2.1206918096), (46.0416666667, 0)],
                knots=[0.726906329, 0.726906329, 0.726906329, 0.726906329, 1, 1, 1, 1], degree=3))
        make_face()
        with BuildLine():
            Line((8, 6), (-8, 6))
            ThreePointArc((-8, 6), (-10, 0), (-8, -6))
            Line((-8, -6), (8, -6))
            ThreePointArc((8, -6), (9.4868329805, -3.1622776602), (10, 0))
            ThreePointArc((10, 0), (9.4868329805, 3.1622776602), (8, 6))
        make_face()
        with Locations((-3.7, 0)):
            Circle(F2_R, mode=Mode.SUBTRACT)
        Circle(F2_R_2, mode=Mode.SUBTRACT)
        with Locations((3.7, 0)):
            Circle(F2_R, mode=Mode.SUBTRACT)
        with BuildLine():
            Line((64.9547362718, -6), (63.2057347542, -6))
            add(Edge.make_bspline(
                [(63.2057347542, -6), (63.8460680348, -6.9669937179), (64.6067347392, -8.7255695183), (64.6775118095, -7.1022633325), (64.9547362718, -6)],
                knots=[0.314529079, 0.314529079, 0.314529079, 0.314529079, 0.4915907173, 0.6769348689, 0.6769348689, 0.6769348689, 0.6769348689], degree=3))
        make_face()
        with BuildLine():
            add(Edge.make_bspline(
                [(63.2057347542, 6), (63.8460680348, 6.9669937179), (64.6067347392, 8.7255695183), (64.6775118095, 7.1022633325), (64.9547362718, 6)],
                knots=[0.314529079, 0.314529079, 0.314529079, 0.314529079, 0.4915907173, 0.6769348689, 0.6769348689, 0.6769348689, 0.6769348689], degree=3))
            Line((63.2057347542, 6), (64.9547362718, 6))
        make_face()
        with BuildLine():
            add(Edge.make_bspline(
                [(53.6581738244, 6), (52.2194091826, 7.5513160935), (51.4119093355, 10.0220105563), (48.4450081755, 7.5705644038), (47.4167542526, 6)],
                knots=[0.1542850544, 0.1542850544, 0.1542850544, 0.1542850544, 0.4703791662, 0.726906329, 0.726906329, 0.726906329, 0.726906329], degree=3))
            Line((47.4167542526, 6), (53.6581738244, 6))
        make_face()
        with BuildLine():
            Line((53.6581738244, -6), (47.4167542526, -6))
            add(Edge.make_bspline(
                [(53.6581738244, -6), (52.2194091826, -7.5513160935), (51.4119093355, -10.0220105563), (48.4450081755, -7.5705644038), (47.4167542526, -6)],
                knots=[0.1542850544, 0.1542850544, 0.1542850544, 0.1542850544, 0.4703791662, 0.726906329, 0.726906329, 0.726906329, 0.726906329], degree=3))
        make_face()
    extrude(amount=-F3_DEPTH)

    # F4#2
    f4_2_edges = [f3.edges().sort_by_distance(p)[0] for p in [
        (-26.333333, 6, -1),
        (-26.333333, -6, -1),
    ]]
    fillet(f4_2_edges, radius=F4_2_R)


solid = Compound([f1.part, f3.part])
